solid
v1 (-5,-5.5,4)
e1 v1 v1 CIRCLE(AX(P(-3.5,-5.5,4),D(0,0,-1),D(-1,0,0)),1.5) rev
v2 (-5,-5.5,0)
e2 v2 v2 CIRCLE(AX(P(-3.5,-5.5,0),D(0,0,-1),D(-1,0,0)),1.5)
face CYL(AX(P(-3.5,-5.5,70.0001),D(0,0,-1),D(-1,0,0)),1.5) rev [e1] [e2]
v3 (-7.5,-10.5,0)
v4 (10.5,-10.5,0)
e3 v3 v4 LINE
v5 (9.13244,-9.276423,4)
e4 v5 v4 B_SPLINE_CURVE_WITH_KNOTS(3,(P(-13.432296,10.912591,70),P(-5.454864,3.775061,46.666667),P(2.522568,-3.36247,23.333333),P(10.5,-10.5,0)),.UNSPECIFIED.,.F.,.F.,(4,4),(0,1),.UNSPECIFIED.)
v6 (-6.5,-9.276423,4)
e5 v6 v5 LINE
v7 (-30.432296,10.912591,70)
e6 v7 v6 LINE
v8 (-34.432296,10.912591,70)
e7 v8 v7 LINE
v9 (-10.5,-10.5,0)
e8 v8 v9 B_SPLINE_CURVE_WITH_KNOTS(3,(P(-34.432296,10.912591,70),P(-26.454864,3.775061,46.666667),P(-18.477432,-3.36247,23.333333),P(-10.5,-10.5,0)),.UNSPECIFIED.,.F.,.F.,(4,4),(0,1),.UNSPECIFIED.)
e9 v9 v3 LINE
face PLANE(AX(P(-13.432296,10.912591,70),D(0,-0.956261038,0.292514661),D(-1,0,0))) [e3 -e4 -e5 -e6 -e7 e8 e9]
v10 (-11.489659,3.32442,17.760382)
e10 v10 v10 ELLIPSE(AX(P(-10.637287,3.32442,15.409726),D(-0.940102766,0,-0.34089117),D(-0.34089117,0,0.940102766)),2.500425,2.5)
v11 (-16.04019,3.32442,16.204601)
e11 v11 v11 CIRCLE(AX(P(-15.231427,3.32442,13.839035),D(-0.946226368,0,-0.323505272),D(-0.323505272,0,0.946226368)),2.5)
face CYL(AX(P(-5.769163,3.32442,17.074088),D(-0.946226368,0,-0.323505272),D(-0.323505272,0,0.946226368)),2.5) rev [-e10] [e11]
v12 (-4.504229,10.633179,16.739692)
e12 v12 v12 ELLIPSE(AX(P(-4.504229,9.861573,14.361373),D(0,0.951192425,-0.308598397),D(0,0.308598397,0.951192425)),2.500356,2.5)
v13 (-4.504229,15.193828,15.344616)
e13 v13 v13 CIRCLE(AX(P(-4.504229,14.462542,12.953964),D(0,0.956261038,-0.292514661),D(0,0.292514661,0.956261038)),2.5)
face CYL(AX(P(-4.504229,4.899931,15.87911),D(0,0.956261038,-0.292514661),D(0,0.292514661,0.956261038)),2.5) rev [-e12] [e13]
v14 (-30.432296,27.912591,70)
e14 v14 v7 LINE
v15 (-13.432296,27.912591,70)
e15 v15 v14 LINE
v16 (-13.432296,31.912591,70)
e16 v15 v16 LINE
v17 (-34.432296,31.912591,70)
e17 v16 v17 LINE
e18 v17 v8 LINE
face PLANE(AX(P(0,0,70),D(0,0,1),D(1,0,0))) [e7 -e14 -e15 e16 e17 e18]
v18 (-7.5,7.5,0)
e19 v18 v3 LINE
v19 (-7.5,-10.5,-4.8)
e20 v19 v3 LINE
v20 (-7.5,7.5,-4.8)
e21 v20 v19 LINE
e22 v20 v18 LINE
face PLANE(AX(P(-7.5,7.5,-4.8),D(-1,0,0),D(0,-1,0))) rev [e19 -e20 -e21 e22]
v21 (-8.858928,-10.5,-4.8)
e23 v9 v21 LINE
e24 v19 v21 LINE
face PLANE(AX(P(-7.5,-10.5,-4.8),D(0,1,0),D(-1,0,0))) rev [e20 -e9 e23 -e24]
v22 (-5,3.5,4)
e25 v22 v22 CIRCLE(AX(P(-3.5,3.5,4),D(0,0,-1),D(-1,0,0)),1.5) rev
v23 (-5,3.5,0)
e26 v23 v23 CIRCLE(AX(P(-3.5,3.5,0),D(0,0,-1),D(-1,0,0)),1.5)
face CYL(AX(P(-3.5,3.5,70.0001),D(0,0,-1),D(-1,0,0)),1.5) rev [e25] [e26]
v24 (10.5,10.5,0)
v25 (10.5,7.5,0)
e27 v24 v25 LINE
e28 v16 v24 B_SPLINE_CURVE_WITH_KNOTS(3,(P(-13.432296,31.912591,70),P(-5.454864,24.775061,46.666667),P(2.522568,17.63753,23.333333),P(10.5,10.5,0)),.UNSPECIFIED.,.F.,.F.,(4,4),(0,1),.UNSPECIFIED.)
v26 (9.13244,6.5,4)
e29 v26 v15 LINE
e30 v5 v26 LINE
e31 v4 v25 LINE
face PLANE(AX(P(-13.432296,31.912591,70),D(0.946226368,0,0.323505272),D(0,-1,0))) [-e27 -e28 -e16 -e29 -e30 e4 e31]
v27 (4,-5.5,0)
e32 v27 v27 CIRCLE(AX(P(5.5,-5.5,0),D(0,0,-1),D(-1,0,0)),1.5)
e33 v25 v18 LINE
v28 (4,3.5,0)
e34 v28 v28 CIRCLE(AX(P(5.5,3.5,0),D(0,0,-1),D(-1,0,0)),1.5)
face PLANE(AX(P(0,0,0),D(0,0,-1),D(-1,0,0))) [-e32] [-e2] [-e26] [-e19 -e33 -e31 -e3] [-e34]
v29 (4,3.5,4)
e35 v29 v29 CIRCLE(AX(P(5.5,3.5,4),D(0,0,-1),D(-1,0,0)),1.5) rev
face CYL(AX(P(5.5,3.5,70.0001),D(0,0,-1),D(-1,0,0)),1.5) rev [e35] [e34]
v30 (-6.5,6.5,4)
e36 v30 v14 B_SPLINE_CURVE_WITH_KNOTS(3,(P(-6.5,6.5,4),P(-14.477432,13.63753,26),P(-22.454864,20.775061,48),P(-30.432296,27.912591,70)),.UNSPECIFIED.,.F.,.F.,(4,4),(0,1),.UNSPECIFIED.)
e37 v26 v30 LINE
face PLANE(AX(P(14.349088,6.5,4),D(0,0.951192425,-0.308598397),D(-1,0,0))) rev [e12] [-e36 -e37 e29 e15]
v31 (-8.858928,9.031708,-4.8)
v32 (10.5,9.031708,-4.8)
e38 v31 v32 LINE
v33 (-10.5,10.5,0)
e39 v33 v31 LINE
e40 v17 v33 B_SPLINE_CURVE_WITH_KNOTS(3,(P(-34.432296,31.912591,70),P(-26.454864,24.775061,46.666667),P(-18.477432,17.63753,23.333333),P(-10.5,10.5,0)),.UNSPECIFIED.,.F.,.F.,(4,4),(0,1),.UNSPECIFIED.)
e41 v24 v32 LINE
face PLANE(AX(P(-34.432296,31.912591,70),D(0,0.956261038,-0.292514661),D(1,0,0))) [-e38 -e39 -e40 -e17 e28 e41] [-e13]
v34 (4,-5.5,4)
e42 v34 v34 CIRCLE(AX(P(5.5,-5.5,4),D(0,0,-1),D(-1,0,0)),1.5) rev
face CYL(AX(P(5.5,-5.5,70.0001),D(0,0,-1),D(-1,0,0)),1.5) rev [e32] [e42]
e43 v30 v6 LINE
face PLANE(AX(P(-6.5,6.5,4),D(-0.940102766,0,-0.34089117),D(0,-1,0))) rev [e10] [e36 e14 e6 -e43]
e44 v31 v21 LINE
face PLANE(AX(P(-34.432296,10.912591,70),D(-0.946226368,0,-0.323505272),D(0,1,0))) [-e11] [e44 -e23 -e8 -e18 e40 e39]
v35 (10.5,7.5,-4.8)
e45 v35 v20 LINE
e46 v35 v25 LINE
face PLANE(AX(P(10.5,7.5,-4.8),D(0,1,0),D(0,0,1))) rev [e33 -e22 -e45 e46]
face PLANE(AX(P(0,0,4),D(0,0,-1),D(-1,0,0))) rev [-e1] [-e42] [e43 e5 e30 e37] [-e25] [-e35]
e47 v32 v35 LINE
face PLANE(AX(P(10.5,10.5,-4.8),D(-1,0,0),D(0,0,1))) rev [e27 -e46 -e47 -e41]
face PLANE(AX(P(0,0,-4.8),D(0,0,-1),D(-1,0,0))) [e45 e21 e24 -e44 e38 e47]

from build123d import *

# Parameters (mm, degrees)
SKETCH4_R             = 1.5
CUT_EXTRUDE1_DEPTH    = 85.285208987
CUT_LOFT1_START       = -30.432295628
CUT_LOFT1_DEPTH       = 40.932295728
CUT_LOFT1_START_2     = -9.276423483
CUT_LOFT1_2_DEPTH     = 37.189014281
CUT_LOFT1_START_3     = -30
CUT_LOFT1_3_OUTLINE_W = 25.432295628
CUT_LOFT1_3_OUTLINE_H = 72
CUT_LOFT1_3_DEPTH     = 19.959259101
CUT_LOFT1_START_4     = 10.040740899
CUT_LOFT1_4_OUTLINE_W = 25.432295628
CUT_LOFT1_4_OUTLINE_H = 72
CUT_LOFT1_4_DEPTH     = 16.959259101
SKETCH10_R            = 2.5
CUT_EXTRUDE2_DEPTH    = 10
SKETCH11_R            = 2.5
CUT_EXTRUDE3_DEPTH    = 10
BOSS_EXTRUDE1_DEPTH   = 4.8
SKETCH14_W            = 37.12113751
SKETCH14_H            = 26.161757616
CUT_EXTRUDE4_DEPTH    = 3
SKETCH15_W            = 15.761114721
SKETCH15_H            = 46.929857457
CUT_EXTRUDE5_DEPTH    = 3


with BuildPart() as part:
    # Loft1: read off the stored shape, not the designer's step
    # Loft1: loft between two sections, ruled curve by curve
    loft1_from = [
        Edge.make_line((-34.432295528, 31.912590798, 70), (-34.432295528, 10.912590798, 70)),
        Edge.make_line((-34.432295528, 10.912590798, 70), (-13.432295528, 10.912590798, 70)),
        Edge.make_line((-13.432295528, 10.912590798, 70), (-13.432295528, 31.912590798, 70)),
        Edge.make_line((-13.432295528, 31.912590798, 70), (-34.432295528, 31.912590798, 70)),
    ]
    loft1_to = [
        Edge.make_line((-10.5, 10.5, 0), (-10.5, -10.5, 0)),
        Edge.make_line((-10.5, -10.5, 0), (10.5, -10.5, 0)),
        Edge.make_line((10.5, -10.5, 0), (10.5, 10.5, 0)),
        Edge.make_line((10.5, 10.5, 0), (-10.5, 10.5, 0)),
    ]
    loft1 = Solid(Shell([*[Face.make_surface_from_curves(loft1_from[k], loft1_to[k]) for k in range(4)], Face(Wire(loft1_from)), Face(Wire(loft1_to))]))
    add(loft1)

    # Sketch4 → Cut-Extrude1 (cut, through all)
    with BuildSketch(Plane(origin=(0, 0, 0), x_dir=(-1, 0, 0), z_dir=(0, 0, -1))):
        with Locations((3.5, -5.5)):
            Circle(SKETCH4_R)
        with Locations((-5.5, -5.5)):
            Circle(SKETCH4_R)
        with Locations((-5.5, 3.5)):
            Circle(SKETCH4_R)
        with Locations((3.5, 3.5)):
            Circle(SKETCH4_R)
    extrude(amount=-CUT_EXTRUDE1_DEPTH, mode=Mode.SUBTRACT)

    # Cut-Loft1: read off the stored shape, not the designer's step
    # Cut-Loft1 outline → Cut-Loft1 (cut)
    with BuildSketch(Plane.YZ.offset(CUT_LOFT1_START)):
        Polygon((10.912590798, 70), (-9.276423383, 4), (6.5, 4), (27.912590798, 70), align=None)
    extrude(amount=CUT_LOFT1_DEPTH, mode=Mode.SUBTRACT)

    # Cut-Loft1 2 outline → Cut-Loft1 2 (add)
    with BuildSketch(Plane(origin=(0, 0, 0), x_dir=(1, 0, 0), z_dir=(0, 1, 0)).offset(CUT_LOFT1_START_2)):
        Polygon((-6.5, -4), (-11.867559744, -4), (-30.432295628, -58.300328622), (-30.432295628, -70), align=None)
    extrude(amount=CUT_LOFT1_2_DEPTH)

    # Cut-Loft1 3 outline → Cut-Loft1 3 (cut)
    with BuildSketch(Plane(origin=(0, 0, 0), x_dir=(1, 0, 0), z_dir=(0, 0.9562610380135655, -0.2925146614739479)).offset(CUT_LOFT1_START_3)):
        with Locations((-17.716147814, -36)):
            Rectangle(CUT_LOFT1_3_OUTLINE_W, CUT_LOFT1_3_OUTLINE_H)
    extrude(amount=CUT_LOFT1_3_DEPTH, mode=Mode.SUBTRACT)

    # Cut-Loft1 4 outline → Cut-Loft1 4 (cut)
    with BuildSketch(Plane(origin=(0, 0, 0), x_dir=(1, 0, 0), z_dir=(0, 0.9562610380135655, -0.2925146614739479)).offset(CUT_LOFT1_START_4)):
        with Locations((-17.716147814, -36)):
            Rectangle(CUT_LOFT1_4_OUTLINE_W, CUT_LOFT1_4_OUTLINE_H)
    extrude(amount=CUT_LOFT1_4_DEPTH, mode=Mode.SUBTRACT)

    # Sketch10 → Cut-Extrude2 (cut)
    with BuildSketch(Plane(origin=(0, 9.601569315, -2.937063925), x_dir=(1, 0, 0), z_dir=(0, 0.9562610380135655, -0.29251466147394767))):
        with Locations(Location((-4.504228797, -16.617876366, 0), (0, 0, 270))):
            Circle(SKETCH10_R)
    extrude(amount=-CUT_EXTRUDE2_DEPTH, mode=Mode.SUBTRACT)

    # Sketch11 → Cut-Extrude3 (cut)
    with BuildSketch(Plane(origin=(-9.401115557, 0, -3.214146797), x_dir=(-0.3235052723680801, 0, 0.9462263676045255), z_dir=(-0.9462263676045255, 0, -0.3235052723680801))):
        with Locations((18.022307071, 3.324420334)):
            Circle(SKETCH11_R)
    extrude(amount=-CUT_EXTRUDE3_DEPTH, mode=Mode.SUBTRACT)

    # Sketch13 → Boss-Extrude1 (add)
    with BuildSketch(Plane(origin=(0, 0, 0), x_dir=(-1, 0, 0), z_dir=(0, 0, -1))):
        Polygon((10.5, -10.5), (10.5, 10.5), (-10.5, 10.5), (-10.5, 7.5), (7.5, 7.5), (7.5, -10.5), align=None)
    extrude(amount=BOSS_EXTRUDE1_DEPTH)

    # Sketch14 → Cut-Extrude4 (cut)
    with BuildSketch(Plane(origin=(0, 9.601569315, -2.937063925), x_dir=(1, 0, 0), z_dir=(0, 0.9562610380135657, -0.2925146614739477))):
        with Locations((-1.808901269, 4.696953713)):
            Rectangle(SKETCH14_W, SKETCH14_H)
    extrude(amount=CUT_EXTRUDE4_DEPTH, mode=Mode.SUBTRACT)

    # Sketch15 → Cut-Extrude5 (cut)
    with BuildSketch(Plane(origin=(-9.401115557, 0, -3.214146797), x_dir=(-0.32350527236808013, 0, 0.9462263676045254), z_dir=(-0.9462263676045255, 0, -0.32350527236808013))):
        with Locations((3.08021958, -4.471111323)):
            Rectangle(SKETCH15_W, SKETCH15_H)
    extrude(amount=CUT_EXTRUDE5_DEPTH, mode=Mode.SUBTRACT)


solid = part.part
